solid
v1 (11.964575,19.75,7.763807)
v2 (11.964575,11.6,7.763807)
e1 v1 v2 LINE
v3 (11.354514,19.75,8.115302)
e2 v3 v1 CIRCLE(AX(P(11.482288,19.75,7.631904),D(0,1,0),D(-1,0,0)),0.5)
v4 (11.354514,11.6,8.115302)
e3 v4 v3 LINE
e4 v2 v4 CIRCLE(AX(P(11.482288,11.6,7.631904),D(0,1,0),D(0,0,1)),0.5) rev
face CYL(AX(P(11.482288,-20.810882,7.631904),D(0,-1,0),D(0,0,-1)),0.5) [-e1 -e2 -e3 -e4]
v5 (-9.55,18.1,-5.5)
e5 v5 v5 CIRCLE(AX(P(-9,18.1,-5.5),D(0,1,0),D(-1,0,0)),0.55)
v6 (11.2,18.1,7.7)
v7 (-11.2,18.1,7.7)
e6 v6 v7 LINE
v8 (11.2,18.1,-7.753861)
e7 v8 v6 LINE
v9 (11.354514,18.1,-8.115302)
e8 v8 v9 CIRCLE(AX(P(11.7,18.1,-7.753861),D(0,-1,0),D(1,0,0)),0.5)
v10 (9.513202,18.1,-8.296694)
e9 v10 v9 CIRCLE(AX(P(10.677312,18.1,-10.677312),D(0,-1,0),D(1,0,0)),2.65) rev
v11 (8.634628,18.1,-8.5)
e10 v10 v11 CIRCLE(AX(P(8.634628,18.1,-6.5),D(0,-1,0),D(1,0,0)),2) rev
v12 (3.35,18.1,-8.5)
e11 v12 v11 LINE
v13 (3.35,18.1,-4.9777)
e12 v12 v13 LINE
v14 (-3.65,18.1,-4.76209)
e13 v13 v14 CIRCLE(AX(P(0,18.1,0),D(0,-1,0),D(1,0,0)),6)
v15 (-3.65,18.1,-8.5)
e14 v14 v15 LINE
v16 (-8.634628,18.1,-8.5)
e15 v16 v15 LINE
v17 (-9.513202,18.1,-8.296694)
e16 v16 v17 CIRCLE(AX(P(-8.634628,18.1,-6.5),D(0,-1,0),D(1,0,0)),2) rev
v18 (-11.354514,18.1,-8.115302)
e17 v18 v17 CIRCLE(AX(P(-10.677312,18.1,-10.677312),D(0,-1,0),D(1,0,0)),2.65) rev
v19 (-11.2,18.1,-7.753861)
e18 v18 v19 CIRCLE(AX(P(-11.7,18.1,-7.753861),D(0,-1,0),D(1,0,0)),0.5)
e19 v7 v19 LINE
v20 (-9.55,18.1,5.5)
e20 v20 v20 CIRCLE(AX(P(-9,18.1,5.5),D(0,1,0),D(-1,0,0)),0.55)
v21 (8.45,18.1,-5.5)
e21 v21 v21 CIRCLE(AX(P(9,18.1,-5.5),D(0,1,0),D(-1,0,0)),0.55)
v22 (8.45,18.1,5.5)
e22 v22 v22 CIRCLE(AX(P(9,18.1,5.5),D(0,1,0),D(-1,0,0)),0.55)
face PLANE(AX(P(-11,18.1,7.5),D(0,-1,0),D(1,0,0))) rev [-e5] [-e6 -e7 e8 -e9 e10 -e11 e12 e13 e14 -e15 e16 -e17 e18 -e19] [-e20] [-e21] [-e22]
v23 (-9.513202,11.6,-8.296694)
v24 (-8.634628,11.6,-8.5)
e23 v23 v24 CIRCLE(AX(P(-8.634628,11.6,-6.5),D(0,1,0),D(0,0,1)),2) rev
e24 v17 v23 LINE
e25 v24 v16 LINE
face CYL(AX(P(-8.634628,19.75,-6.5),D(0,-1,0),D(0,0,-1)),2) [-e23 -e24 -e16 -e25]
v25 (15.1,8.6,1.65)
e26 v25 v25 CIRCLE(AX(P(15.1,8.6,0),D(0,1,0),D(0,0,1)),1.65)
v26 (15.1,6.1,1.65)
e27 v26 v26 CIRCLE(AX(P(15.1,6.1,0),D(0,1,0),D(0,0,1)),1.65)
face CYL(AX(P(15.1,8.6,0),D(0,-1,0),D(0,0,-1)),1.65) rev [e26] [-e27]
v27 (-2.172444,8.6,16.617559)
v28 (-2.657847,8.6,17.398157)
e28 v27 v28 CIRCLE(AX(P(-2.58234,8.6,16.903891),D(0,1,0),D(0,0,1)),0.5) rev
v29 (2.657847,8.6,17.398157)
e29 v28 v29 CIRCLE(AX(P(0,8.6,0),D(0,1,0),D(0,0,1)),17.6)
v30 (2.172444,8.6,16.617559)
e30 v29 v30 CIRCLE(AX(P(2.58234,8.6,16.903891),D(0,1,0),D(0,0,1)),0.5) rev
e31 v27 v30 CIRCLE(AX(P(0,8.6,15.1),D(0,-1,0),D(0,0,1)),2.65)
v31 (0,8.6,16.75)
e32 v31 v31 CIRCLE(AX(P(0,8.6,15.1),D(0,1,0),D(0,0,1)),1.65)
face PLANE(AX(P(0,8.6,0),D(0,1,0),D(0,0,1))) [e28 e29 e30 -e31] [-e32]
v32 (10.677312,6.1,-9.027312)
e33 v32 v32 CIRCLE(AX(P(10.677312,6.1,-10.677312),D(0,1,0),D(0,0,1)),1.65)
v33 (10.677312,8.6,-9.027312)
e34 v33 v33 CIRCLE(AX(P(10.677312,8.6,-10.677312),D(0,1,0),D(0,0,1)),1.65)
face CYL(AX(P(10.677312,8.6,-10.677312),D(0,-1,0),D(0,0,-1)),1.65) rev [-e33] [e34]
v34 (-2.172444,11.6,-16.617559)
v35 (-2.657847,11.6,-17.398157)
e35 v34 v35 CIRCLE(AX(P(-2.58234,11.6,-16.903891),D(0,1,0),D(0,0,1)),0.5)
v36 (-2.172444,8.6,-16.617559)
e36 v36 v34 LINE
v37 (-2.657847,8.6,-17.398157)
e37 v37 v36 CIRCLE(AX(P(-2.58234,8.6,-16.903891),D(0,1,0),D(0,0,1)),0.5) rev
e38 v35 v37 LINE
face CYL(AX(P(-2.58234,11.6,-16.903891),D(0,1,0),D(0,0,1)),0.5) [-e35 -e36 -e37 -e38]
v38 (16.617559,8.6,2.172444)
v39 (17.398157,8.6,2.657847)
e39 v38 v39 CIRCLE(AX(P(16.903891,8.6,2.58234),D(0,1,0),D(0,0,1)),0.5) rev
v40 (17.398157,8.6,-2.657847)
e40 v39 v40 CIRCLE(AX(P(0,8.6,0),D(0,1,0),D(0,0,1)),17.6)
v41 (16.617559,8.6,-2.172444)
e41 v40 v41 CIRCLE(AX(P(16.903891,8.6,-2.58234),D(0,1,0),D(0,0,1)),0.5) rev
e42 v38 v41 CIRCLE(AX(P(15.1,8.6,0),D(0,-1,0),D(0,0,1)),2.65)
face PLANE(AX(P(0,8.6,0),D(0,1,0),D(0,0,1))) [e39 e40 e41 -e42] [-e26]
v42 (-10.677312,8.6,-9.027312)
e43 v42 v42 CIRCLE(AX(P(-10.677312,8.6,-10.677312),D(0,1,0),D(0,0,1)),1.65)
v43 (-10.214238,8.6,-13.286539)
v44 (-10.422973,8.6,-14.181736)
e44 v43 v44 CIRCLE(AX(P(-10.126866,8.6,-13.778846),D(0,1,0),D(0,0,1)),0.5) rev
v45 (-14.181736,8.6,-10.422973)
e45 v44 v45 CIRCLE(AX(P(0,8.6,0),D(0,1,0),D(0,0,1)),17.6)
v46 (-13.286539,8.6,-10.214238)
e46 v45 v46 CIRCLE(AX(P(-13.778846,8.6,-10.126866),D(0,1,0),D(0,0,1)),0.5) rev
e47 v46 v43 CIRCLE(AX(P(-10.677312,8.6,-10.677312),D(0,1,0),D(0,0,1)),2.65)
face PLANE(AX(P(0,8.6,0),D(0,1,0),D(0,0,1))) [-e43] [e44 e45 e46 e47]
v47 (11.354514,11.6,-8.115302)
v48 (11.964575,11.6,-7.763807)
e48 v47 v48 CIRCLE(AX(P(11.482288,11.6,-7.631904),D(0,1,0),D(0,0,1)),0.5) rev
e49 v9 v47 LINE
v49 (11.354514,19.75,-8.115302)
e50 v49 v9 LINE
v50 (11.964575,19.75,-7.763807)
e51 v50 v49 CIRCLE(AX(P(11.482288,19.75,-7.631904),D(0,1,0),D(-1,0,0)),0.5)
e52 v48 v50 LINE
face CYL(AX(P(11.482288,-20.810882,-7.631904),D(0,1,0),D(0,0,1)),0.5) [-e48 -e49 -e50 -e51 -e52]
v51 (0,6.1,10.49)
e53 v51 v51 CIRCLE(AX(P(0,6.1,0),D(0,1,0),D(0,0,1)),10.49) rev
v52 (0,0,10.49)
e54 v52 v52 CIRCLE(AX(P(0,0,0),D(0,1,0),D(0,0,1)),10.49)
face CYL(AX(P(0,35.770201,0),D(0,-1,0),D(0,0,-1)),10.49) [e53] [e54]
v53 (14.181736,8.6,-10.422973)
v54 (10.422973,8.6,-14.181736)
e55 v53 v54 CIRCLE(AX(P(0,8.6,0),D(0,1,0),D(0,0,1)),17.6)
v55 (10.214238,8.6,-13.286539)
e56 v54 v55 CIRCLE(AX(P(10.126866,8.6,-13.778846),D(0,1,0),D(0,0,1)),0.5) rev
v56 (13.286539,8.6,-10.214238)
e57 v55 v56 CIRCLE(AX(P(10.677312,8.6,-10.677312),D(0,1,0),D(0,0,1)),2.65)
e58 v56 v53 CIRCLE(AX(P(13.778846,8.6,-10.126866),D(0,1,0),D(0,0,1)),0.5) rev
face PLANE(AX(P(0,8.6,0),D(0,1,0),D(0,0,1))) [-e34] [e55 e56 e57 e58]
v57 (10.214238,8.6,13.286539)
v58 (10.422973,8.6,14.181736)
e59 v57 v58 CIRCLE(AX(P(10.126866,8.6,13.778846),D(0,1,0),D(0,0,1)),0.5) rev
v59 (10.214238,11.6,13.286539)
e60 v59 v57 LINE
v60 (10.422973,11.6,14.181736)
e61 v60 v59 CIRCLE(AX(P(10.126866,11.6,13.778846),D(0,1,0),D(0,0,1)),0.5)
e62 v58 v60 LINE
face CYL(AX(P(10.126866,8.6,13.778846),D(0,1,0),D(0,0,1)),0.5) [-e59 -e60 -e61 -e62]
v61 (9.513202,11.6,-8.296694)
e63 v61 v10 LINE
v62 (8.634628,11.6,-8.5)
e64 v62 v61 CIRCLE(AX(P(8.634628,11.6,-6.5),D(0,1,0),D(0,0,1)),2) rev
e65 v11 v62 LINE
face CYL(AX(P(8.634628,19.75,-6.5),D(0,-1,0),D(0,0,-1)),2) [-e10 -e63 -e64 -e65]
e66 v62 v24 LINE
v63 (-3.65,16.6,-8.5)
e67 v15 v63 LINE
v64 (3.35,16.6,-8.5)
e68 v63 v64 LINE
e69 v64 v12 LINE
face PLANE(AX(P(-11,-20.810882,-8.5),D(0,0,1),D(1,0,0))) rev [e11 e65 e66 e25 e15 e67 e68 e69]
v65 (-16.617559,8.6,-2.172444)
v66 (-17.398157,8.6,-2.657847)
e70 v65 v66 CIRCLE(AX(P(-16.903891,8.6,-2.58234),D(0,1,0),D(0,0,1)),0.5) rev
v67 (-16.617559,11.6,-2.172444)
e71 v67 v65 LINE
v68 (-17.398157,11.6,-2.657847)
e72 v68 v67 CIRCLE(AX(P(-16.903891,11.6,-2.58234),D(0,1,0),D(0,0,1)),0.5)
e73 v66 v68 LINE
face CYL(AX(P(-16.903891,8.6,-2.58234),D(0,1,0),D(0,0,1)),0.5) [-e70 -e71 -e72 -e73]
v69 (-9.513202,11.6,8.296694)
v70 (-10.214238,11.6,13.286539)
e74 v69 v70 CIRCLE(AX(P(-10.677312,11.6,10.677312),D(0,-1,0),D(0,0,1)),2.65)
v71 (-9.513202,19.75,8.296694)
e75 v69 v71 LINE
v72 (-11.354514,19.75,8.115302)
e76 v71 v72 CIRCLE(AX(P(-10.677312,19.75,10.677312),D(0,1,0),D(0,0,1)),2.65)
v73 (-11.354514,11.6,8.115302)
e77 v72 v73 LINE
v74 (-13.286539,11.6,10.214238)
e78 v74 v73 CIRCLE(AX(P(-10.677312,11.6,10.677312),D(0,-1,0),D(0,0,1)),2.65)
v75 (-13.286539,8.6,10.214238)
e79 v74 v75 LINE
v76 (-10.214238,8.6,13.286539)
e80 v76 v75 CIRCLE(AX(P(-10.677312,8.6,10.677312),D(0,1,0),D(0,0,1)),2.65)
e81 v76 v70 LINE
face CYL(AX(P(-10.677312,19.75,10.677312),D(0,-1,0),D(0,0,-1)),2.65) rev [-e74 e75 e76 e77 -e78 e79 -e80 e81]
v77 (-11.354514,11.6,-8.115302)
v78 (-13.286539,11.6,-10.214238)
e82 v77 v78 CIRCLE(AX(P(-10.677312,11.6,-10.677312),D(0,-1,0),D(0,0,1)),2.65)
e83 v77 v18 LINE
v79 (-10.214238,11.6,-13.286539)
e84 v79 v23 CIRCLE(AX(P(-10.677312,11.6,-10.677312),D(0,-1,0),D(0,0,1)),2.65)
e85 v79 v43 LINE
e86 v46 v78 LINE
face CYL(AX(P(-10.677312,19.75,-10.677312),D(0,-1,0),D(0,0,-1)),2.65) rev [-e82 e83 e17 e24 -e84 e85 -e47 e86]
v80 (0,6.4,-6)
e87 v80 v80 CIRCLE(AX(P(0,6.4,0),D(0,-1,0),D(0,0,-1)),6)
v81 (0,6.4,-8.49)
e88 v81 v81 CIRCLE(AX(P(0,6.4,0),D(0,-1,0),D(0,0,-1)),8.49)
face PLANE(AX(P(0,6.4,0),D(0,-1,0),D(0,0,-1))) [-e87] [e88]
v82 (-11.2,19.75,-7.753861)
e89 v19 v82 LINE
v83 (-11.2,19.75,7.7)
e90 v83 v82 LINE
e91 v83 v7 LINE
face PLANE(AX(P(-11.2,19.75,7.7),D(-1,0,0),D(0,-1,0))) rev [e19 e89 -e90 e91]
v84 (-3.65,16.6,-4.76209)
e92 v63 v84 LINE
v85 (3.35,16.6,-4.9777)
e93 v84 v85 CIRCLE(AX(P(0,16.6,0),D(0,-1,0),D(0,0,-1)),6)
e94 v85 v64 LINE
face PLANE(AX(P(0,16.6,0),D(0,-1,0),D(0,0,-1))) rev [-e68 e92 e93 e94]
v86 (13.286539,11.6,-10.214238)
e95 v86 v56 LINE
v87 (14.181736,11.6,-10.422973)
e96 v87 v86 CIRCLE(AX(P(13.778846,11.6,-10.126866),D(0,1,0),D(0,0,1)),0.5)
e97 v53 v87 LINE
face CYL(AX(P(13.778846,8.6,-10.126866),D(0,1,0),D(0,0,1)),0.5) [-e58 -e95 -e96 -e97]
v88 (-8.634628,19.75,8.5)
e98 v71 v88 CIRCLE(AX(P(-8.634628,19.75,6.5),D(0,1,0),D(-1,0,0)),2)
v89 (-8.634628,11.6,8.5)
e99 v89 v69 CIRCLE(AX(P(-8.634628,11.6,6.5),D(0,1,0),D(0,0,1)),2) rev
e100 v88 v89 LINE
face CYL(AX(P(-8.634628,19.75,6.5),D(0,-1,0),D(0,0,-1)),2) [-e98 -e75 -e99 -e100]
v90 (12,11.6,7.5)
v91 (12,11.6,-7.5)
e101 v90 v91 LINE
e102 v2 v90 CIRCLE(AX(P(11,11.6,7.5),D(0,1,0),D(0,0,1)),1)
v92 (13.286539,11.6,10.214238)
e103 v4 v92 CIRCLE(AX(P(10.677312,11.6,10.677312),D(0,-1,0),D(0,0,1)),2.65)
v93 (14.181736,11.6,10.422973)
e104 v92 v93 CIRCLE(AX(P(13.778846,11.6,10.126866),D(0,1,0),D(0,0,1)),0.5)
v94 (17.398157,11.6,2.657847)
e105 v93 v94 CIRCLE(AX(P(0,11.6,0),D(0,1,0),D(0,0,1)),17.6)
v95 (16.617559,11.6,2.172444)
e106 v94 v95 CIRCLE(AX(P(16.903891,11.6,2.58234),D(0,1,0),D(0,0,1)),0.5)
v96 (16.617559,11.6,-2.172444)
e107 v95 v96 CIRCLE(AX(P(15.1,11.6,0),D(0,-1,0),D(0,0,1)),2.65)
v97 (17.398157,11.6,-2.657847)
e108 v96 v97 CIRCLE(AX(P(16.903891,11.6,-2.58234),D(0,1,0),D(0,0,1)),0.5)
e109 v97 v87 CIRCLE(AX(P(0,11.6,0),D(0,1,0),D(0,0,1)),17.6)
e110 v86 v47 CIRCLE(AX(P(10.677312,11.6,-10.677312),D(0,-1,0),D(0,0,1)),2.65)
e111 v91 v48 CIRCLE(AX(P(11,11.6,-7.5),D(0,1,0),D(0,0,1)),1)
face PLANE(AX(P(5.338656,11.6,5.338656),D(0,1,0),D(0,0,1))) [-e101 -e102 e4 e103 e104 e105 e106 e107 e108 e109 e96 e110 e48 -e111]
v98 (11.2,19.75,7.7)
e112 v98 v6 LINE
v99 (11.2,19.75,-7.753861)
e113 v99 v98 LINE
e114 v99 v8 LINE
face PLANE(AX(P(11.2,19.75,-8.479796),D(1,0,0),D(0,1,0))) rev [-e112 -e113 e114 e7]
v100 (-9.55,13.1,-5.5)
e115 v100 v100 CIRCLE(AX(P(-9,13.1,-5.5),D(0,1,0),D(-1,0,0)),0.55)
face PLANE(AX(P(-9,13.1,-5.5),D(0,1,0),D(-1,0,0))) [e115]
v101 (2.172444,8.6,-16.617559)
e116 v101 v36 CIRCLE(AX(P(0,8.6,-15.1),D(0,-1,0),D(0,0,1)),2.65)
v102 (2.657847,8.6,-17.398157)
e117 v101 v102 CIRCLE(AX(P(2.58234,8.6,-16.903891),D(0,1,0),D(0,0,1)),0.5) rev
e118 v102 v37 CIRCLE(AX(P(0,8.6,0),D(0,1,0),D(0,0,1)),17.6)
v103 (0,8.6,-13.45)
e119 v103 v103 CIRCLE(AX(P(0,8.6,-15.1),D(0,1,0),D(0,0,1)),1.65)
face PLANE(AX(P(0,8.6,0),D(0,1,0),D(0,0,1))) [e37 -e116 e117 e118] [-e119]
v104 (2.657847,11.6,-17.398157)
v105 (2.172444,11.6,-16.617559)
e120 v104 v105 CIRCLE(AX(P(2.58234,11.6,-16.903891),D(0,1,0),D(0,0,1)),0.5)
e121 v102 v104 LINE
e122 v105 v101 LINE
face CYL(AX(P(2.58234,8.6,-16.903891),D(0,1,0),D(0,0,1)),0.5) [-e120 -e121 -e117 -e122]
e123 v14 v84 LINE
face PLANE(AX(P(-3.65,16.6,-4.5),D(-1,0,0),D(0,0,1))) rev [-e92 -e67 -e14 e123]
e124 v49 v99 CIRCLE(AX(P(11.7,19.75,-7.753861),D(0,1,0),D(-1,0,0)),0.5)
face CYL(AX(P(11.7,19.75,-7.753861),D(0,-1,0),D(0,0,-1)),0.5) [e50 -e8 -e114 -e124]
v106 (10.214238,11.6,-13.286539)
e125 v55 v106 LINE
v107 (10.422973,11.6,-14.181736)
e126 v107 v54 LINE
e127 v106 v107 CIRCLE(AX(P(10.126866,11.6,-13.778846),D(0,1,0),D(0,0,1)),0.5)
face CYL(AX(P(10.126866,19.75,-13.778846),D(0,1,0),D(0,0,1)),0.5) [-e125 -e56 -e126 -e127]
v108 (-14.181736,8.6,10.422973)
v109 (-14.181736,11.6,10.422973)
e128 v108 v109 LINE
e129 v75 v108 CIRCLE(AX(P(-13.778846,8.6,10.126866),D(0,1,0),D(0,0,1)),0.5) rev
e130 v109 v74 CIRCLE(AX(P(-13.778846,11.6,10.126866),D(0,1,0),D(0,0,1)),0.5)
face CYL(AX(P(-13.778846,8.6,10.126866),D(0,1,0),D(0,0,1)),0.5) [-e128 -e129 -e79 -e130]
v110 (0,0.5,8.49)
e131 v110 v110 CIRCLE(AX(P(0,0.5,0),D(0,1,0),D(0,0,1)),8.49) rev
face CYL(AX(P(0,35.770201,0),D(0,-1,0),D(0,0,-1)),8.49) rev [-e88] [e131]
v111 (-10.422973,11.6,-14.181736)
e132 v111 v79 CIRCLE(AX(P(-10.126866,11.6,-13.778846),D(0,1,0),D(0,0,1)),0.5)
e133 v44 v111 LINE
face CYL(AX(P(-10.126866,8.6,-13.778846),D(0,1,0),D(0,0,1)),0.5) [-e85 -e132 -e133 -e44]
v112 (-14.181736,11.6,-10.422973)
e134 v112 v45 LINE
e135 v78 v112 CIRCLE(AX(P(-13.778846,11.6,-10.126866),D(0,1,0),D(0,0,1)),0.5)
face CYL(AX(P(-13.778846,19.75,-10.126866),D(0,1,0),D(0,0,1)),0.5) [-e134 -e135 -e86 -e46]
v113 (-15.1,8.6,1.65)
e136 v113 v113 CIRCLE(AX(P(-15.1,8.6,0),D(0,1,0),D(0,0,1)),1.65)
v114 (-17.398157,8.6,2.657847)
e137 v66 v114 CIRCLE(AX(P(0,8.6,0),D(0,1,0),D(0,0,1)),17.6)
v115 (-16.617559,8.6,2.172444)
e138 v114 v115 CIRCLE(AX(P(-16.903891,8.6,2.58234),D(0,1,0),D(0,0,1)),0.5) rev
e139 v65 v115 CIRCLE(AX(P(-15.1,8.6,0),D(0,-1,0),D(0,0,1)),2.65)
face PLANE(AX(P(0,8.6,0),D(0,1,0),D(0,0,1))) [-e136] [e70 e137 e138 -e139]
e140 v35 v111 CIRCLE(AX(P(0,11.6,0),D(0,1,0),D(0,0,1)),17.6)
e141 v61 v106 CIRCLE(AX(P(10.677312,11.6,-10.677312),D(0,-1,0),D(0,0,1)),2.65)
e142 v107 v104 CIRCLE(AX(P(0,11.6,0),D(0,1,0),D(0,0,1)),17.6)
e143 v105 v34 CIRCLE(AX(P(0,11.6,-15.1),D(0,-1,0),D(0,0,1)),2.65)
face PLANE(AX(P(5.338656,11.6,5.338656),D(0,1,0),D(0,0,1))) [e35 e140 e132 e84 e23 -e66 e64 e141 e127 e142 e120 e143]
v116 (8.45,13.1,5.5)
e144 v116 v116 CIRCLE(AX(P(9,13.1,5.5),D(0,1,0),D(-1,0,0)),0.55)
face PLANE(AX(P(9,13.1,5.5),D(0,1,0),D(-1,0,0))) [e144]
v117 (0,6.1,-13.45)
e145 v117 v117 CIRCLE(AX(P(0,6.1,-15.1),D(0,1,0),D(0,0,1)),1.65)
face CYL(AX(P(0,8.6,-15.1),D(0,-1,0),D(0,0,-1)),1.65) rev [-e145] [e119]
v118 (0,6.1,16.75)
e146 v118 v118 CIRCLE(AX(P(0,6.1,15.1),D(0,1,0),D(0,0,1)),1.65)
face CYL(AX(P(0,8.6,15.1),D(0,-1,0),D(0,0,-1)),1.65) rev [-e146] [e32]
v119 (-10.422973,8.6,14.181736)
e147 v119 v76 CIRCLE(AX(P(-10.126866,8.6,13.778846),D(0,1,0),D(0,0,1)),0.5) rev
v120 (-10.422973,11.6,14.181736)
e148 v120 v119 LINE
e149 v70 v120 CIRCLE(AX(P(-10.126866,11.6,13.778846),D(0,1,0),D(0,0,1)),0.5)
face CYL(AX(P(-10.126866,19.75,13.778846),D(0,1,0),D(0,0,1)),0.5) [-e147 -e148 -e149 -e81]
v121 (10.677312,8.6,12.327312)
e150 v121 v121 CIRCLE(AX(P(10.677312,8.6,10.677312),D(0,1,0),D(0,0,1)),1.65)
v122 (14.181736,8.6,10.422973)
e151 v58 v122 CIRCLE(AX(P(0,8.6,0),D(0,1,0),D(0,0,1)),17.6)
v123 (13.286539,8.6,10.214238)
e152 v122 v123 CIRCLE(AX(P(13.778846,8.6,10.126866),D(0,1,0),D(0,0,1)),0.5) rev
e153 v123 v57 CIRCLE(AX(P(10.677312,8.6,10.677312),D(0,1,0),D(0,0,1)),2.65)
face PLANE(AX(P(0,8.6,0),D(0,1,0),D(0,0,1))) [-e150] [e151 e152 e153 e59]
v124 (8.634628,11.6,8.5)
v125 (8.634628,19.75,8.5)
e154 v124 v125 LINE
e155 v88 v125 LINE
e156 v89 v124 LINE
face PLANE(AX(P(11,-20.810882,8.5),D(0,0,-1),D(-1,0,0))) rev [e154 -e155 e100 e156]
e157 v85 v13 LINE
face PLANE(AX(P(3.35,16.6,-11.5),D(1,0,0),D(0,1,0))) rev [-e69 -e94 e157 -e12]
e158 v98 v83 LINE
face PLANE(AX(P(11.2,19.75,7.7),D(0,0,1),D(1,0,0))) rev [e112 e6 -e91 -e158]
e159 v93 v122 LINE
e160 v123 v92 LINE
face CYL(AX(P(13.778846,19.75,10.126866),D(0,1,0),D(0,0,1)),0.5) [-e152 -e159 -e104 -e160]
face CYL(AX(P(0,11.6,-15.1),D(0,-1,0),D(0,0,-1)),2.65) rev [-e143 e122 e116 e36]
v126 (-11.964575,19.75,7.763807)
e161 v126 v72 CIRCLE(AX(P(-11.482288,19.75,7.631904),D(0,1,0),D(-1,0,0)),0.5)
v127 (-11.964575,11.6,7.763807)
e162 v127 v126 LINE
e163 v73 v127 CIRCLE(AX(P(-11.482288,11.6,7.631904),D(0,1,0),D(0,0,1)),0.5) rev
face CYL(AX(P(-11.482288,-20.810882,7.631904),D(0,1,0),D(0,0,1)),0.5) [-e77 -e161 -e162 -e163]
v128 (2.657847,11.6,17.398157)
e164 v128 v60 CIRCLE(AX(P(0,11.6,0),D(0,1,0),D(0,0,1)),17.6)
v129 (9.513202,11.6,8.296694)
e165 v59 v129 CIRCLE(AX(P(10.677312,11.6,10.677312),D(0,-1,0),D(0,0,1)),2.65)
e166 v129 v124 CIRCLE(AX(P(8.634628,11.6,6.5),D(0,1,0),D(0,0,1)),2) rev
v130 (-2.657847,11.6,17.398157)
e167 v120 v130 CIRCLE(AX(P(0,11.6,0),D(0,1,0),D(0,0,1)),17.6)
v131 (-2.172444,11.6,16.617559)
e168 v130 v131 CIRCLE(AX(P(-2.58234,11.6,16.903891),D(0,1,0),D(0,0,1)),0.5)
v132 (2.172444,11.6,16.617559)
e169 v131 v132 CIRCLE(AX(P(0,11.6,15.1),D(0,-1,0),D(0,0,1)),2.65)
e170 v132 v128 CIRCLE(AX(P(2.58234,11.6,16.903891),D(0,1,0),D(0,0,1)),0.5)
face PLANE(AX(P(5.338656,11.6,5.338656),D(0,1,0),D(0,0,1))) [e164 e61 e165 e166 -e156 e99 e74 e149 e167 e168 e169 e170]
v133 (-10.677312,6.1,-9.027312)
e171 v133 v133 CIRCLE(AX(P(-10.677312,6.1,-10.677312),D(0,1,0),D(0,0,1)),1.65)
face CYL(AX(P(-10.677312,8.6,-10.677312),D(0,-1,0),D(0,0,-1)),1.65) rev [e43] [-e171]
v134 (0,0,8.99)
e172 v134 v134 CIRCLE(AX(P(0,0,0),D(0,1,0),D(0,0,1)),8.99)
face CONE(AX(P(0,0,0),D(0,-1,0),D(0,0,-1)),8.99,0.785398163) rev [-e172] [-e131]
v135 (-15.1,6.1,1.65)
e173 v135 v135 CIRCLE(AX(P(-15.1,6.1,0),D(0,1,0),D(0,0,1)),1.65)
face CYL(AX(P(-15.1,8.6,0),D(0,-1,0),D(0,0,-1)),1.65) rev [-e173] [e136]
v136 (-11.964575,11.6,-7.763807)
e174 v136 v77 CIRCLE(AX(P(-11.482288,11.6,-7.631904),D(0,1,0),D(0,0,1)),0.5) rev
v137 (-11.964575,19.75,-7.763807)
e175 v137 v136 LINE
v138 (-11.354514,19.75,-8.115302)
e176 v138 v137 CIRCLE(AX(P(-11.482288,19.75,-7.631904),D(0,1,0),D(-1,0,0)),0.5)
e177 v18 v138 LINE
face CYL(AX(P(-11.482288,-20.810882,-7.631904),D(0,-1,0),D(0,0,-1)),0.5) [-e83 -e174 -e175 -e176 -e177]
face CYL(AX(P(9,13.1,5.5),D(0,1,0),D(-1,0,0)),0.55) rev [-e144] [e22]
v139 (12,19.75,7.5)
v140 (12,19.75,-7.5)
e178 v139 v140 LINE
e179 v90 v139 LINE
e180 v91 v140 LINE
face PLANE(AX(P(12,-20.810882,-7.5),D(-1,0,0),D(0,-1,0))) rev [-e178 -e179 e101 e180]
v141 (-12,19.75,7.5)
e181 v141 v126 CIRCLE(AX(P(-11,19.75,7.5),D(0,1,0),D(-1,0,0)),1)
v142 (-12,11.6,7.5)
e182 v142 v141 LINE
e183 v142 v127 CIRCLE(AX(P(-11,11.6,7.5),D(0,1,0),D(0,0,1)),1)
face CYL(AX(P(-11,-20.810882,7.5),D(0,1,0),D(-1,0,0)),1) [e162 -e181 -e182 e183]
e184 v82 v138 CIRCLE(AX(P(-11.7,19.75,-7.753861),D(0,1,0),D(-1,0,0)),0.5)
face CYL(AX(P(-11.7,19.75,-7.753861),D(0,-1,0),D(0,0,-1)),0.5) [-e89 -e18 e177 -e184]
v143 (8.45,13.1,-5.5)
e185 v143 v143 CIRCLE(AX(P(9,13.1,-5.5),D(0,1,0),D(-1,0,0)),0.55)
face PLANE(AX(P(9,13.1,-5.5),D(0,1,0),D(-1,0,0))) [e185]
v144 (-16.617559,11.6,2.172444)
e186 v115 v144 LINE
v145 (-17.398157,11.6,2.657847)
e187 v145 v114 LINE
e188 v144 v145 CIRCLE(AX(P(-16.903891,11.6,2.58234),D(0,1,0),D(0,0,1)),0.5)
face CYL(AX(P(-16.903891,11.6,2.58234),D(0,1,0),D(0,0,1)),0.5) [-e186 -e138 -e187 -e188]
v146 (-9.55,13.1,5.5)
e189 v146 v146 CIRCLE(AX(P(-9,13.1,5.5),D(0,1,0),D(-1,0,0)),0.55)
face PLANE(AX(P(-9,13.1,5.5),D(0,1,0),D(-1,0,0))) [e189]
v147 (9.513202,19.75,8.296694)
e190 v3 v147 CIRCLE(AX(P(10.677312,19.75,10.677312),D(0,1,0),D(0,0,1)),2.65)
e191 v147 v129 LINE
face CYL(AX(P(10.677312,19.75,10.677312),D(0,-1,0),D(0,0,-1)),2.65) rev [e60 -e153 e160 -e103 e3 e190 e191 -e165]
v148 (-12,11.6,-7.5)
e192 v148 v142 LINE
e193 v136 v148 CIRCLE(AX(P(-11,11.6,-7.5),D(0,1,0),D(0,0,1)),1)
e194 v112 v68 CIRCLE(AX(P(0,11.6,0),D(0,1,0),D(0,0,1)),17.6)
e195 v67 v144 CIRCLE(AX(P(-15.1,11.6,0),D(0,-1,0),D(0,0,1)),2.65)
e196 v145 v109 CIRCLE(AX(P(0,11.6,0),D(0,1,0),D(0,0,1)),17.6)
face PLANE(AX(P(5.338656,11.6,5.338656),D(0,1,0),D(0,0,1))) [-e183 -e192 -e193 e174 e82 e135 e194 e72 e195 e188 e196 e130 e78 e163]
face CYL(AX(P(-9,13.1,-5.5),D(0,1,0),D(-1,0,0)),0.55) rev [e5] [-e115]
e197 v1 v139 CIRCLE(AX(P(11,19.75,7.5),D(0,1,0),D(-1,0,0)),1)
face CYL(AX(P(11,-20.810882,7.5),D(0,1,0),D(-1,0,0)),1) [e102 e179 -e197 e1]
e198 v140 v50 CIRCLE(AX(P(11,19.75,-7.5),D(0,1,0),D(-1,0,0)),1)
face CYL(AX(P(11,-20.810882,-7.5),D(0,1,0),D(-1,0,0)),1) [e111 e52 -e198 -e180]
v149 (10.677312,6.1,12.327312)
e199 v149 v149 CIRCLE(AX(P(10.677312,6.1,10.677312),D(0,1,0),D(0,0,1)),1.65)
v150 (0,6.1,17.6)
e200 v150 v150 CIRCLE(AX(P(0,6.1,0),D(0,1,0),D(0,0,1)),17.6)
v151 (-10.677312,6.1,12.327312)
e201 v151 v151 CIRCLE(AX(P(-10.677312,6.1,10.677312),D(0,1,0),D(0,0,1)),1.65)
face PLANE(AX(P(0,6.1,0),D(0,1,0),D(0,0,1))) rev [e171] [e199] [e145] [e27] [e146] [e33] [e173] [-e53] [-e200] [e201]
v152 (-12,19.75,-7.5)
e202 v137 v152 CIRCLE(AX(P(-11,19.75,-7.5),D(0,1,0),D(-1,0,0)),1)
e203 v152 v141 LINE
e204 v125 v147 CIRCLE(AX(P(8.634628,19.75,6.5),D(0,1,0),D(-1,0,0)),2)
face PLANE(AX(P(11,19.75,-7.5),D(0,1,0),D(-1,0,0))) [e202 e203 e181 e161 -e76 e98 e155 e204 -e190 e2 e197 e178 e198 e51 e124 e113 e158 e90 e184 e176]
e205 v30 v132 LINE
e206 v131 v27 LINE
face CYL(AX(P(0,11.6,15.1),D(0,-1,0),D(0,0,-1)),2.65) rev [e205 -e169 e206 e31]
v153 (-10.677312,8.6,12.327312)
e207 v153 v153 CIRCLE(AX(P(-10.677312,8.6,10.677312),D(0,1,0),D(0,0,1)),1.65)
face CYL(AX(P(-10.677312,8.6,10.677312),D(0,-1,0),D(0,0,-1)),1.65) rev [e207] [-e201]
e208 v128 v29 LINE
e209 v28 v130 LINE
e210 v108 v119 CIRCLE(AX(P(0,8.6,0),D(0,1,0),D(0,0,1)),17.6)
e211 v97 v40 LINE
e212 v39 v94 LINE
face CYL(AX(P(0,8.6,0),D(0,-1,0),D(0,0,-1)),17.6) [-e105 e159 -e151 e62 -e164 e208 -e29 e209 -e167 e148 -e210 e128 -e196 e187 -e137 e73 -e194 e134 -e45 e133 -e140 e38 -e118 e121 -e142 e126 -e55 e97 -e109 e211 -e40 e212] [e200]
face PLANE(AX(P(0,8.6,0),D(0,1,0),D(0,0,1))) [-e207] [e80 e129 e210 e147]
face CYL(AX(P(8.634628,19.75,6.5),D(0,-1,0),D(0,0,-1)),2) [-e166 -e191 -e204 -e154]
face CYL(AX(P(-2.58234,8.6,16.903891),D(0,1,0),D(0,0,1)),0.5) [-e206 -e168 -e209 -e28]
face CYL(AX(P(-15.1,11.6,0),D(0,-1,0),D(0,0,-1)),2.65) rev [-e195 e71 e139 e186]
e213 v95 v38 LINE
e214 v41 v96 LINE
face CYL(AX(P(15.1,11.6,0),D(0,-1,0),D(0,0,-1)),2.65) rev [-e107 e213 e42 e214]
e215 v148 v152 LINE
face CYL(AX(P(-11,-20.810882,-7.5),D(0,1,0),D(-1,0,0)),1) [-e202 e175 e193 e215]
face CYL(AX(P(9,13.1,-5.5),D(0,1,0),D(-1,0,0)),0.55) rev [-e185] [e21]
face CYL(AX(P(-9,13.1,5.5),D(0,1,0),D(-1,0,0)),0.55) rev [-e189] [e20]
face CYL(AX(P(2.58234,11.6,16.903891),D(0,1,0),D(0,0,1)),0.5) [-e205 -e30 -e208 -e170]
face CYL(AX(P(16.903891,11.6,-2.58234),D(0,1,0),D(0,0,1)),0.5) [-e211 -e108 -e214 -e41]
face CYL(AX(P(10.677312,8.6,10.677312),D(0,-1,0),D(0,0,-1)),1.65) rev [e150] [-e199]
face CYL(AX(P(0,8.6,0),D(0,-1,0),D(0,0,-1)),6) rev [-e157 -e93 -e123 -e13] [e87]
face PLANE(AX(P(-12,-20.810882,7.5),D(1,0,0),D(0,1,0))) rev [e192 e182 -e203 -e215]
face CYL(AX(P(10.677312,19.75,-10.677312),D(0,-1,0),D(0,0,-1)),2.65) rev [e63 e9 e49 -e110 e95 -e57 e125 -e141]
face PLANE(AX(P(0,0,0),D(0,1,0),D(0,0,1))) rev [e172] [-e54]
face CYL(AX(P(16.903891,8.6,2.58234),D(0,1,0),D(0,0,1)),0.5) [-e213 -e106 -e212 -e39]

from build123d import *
from build123d.topology import SkipClean

# Parameters (mm, degrees)
SKETCH2_R           = 17.6
SKETCH2_R_2         = 6
SKETCH2_R_3         = 1.65
BOSS_EXTRUDE1_DEPTH = 2.5
SKETCH3_R           = 10.49
SKETCH3_R_2         = 8.49
BOSS_EXTRUDE2_DEPTH = 6.1
BOSS_EXTRUDE3_START = 9.5
SKETCH5_R           = 6
BOSS_EXTRUDE3_DEPTH = 9.5
BOSS_EXTRUDE4_DEPTH = 1.65
SKETCH7_R           = 2.65
CUT_EXTRUDE1_DEPTH  = 28.273476126
SKETCH8_R           = 6
BOSS_EXTRUDE5_DEPTH = 3
FILLET2_R           = 0.5
FILLET3_R           = 0.5
FILLET4_R           = 2
CHAMFER1_SIZE       = 0.5
SKETCH9_R           = 0.55
CUT_EXTRUDE2_DEPTH  = 5
SKETCH10_R          = 8.49
CUT_EXTRUDE4_DEPTH  = 0.3
CUT_EXTRUDE5_DEPTH  = 1.5


with BuildPart() as part:
    # Sketch2 → Boss-Extrude1 (new body)
    with BuildSketch(Plane(origin=(0, 6.1, 0), x_dir=(1, 0, 0), z_dir=(0, 1, 0))):
        with Locations(Location((0, 0, 0), (0, 0, 270))):
            Circle(SKETCH2_R)
        with Locations(Location((0, 0, 0), (0, 0, 270))):
            Circle(SKETCH2_R_2, mode=Mode.SUBTRACT)
        with Locations(Location((0, -15.1, 0), (0, 0, 270))):
            Circle(SKETCH2_R_3, mode=Mode.SUBTRACT)
        with Locations(Location((-10.677312396, -10.677312396, 0), (0, 0, 270))):
            Circle(SKETCH2_R_3, mode=Mode.SUBTRACT)
        with Locations(Location((-15.1, 0, 0), (0, 0, 270))):
            Circle(SKETCH2_R_3, mode=Mode.SUBTRACT)
        with Locations(Location((-10.677312396, 10.677312396, 0), (0, 0, 270))):
            Circle(SKETCH2_R_3, mode=Mode.SUBTRACT)
        with Locations(Location((0, 15.1, 0), (0, 0, 270))):
            Circle(SKETCH2_R_3, mode=Mode.SUBTRACT)
        with Locations(Location((10.677312396, 10.677312396, 0), (0, 0, 270))):
            Circle(SKETCH2_R_3, mode=Mode.SUBTRACT)
        with Locations(Location((15.1, 0, 0), (0, 0, 270))):
            Circle(SKETCH2_R_3, mode=Mode.SUBTRACT)
        with Locations(Location((10.677312396, -10.677312396, 0), (0, 0, 270))):
            Circle(SKETCH2_R_3, mode=Mode.SUBTRACT)
    extrude(amount=BOSS_EXTRUDE1_DEPTH)

    # Sketch3 → Boss-Extrude2 (add)
    with BuildSketch(Plane(origin=(0, 0, 0), x_dir=(1, 0, 0), z_dir=(0, 1, 0))):
        with Locations(Location((0, 0, 0), (0, 0, 270))):
            Circle(SKETCH3_R)
        with Locations(Location((0, 0, 0), (0, 0, 270))):
            Circle(SKETCH3_R_2, mode=Mode.SUBTRACT)
    extrude(amount=BOSS_EXTRUDE2_DEPTH)

    # Sketch5 → Boss-Extrude3 (add)
    with BuildSketch(Plane(origin=(0, 18.1, 0), x_dir=(-1, 0, 0), z_dir=(0, -1, 0)).offset(BOSS_EXTRUDE3_START)):
        with BuildLine():
            Line((-12, 7.5), (-12, -7.5))
            ThreePointArc((-12, -7.5), (-11.707106781, -8.207106781), (-11, -8.5))
            Line((-11, -8.5), (11, -8.5))
            ThreePointArc((11, -8.5), (11.707106781, -8.207106781), (12, -7.5))
            Line((12, -7.5), (12, 7.5))
            ThreePointArc((12, 7.5), (11.707106781, 8.207106781), (11, 8.5))
            Line((11, 8.5), (-11, 8.5))
            ThreePointArc((-11, 8.5), (-11.707106781, 8.207106781), (-12, 7.5))
        make_face()
        with Locations(Location((0, 0, 0), (0, 0, 180))):
            Circle(SKETCH5_R, mode=Mode.SUBTRACT)
    extrude(amount=-BOSS_EXTRUDE3_DEPTH)

    # Sketch6 → Boss-Extrude4 (add)
    with BuildSketch(Plane(origin=(0, 18.1, 0), x_dir=(1, 0, 0), z_dir=(0, 1, 0))):
        with BuildLine():
            Line((-12, 7.5), (-12, -7.5))
            ThreePointArc((-12, -7.5), (-11.707106781, -8.207106781), (-11, -8.5))
            Line((-11, -8.5), (11, -8.5))
            ThreePointArc((11, -8.5), (11.707106781, -8.207106781), (12, -7.5))
            Line((12, -7.5), (12, 7.5))
            ThreePointArc((12, 7.5), (11.774596669, 8.132455532), (11.2, 8.479795897))
            Line((11.2, 8.479795897), (11.2, -7.7))
            Line((11.2, -7.7), (-11.2, -7.7))
            Line((-11.2, -7.7), (-11.2, 8.479795897))
            ThreePointArc((-11.2, 8.479795897), (-11.774596669, 8.132455532), (-12, 7.5))
        make_face()
    extrude(amount=BOSS_EXTRUDE4_DEPTH)

    # Sketch7 → Cut-Extrude1 (cut, through all)
    with BuildSketch(Plane(origin=(0, 8.6, 0), x_dir=(1, 0, 0), z_dir=(0, 1, 0))):
        with Locations((10.677312396, 10.677312396)):
            Circle(SKETCH7_R)
        with Locations((-10.677312396, 10.677312396)):
            Circle(SKETCH7_R)
        with Locations((-10.677312396, -10.677312396)):
            Circle(SKETCH7_R)
        with Locations((10.677312396, -10.677312396)):
            Circle(SKETCH7_R)
    extrude(amount=CUT_EXTRUDE1_DEPTH, mode=Mode.SUBTRACT)

    # Sketch8 → Boss-Extrude5 (add)
    with SkipClean():  # the faces are left unmerged after this step: merging them gives an invalid solid
        with BuildSketch(Plane(origin=(0, 8.6, 0), x_dir=(1, 0, 0), z_dir=(0, 1, 0))):
            with BuildLine():
                ThreePointArc((0.948547859, -17.57442053), (6.73522841, -16.260279772), (11.756267308, -13.097716556))
                ThreePointArc((11.756267308, -13.097716556), (8.803479426, -8.803479426), (13.097716556, -11.756267308))
                ThreePointArc((13.097716556, -11.756267308), (16.260279772, -6.73522841), (17.57442053, -0.948547859))
                ThreePointArc((17.57442053, -0.948547859), (12.45, 0), (17.57442053, 0.948547859))
                ThreePointArc((17.57442053, 0.948547859), (16.260279772, 6.73522841), (13.097716556, 11.756267308))
                ThreePointArc((13.097716556, 11.756267308), (8.803479426, 8.803479426), (11.756267308, 13.097716556))
                ThreePointArc((11.756267308, 13.097716556), (6.73522841, 16.260279772), (0.948547859, 17.57442053))
                ThreePointArc((0.948547859, 17.57442053), (0, 12.45), (-0.948547859, 17.57442053))
                ThreePointArc((-0.948547859, 17.57442053), (-6.73522841, 16.260279772), (-11.756267308, 13.097716556))
                ThreePointArc((-11.756267308, 13.097716556), (-8.803479426, 8.803479426), (-13.097716556, 11.756267308))
                ThreePointArc((-13.097716556, 11.756267308), (-16.260279772, 6.73522841), (-17.57442053, 0.948547859))
                ThreePointArc((-17.57442053, 0.948547859), (-12.45, 0), (-17.57442053, -0.948547859))
                ThreePointArc((-17.57442053, -0.948547859), (-16.260279772, -6.73522841), (-13.097716556, -11.756267308))
                ThreePointArc((-13.097716556, -11.756267308), (-8.803479426, -8.803479426), (-11.756267308, -13.097716556))
                ThreePointArc((-11.756267308, -13.097716556), (-6.73522841, -16.260279772), (-0.948547859, -17.57442053))
                ThreePointArc((-0.948547859, -17.57442053), (0, -12.45), (0.948547859, -17.57442053))
            make_face()
            Circle(SKETCH8_R, mode=Mode.SUBTRACT)
        extrude(amount=BOSS_EXTRUDE5_DEPTH)

    # Fillet2
    # the kernel refuses this fillet: 0.5 mm, written as the material it takes off along each edge
    with BuildSketch(Plane(origin=(-11.686597151, 21.100589596, 8.227038068), x_dir=(0.947787501737023, 0, -0.3189025737605338), z_dir=(0, -1, 0)), Plane(origin=(11.686597151, 21.100589596, -8.227038068), x_dir=(-0.9477875017370256, 0, 0.3189025737605259), z_dir=(0, -1, 0))) as fillet2_piece_1:
        with BuildLine():
            CenterArc((0.383431843, -0.498906206), FILLET2_R, 93.790527606, 89.509954117)
            ThreePointArc((-0.115738823, -0.527692416), (-0.094179071, -0.255882407), (0, 0))
            ThreePointArc((0, 0), (0.175188687, -0.00579711), (0.350377374, 0))
        make_face()
    extrude(amount=9.500589596, mode=Mode.SUBTRACT)
    with BuildSketch(Plane(origin=(11.686597151, 21.100589596, 8.227038068), x_dir=(0.5145498683464933, 0, -0.8574604556389797), z_dir=(0, -1, 0)), Plane(origin=(-11.686597151, 21.100589596, -8.227038068), x_dir=(-0.5145498683463678, 0, 0.8574604556390548), z_dir=(0, -1, 0))) as fillet2_piece_2:
        with BuildLine():
            CenterArc((0.405176879, -0.481413624), FILLET2_R, 74.328716152, 89.509954117)
            ThreePointArc((-0.075064004, -0.342242165), (-0.031869492, -0.172363041), (0, 0))
            ThreePointArc((0, 0), (0.270117919, 0.037172752), (0.540235838, 0))
        make_face()
    extrude(amount=9.500589596, mode=Mode.SUBTRACT)
    with BuildSketch(Plane(origin=(11.756267308, 8.6, 13.097716556), x_dir=(-0.7759095356901404, 0, 0.6308441902919537), z_dir=(0, 1, 0)), Plane(origin=(13.097716556, 8.6, -11.756267308), x_dir=(0.6308441902919549, 0, 0.7759095356901394), z_dir=(0, 1, 0)), Plane(origin=(-11.756267308, 8.6, -13.097716556), x_dir=(0.775909535690134, 0, -0.6308441902919616), z_dir=(0, 1, 0)), Plane(origin=(-13.097716556, 8.6, 11.756267308), x_dir=(-0.630844190291963, 0, -0.7759095356901329), z_dir=(0, 1, 0)), Plane(origin=(17.57442053, 8.6, 0.948547859), x_dir=(-0.1025766894462237, 0, 0.9947250991013814), z_dir=(0, 1, 0)), Plane(origin=(0.948547859, 8.6, -17.57442053), x_dir=(0.9947250991013814, 0, 0.10257668944622358), z_dir=(0, 1, 0)), Plane(origin=(-17.57442053, 8.6, -0.948547859), x_dir=(0.1025766894462172, 0, -0.9947250991013821), z_dir=(0, 1, 0)), Plane(origin=(-0.948547859, 8.6, 17.57442053), x_dir=(-0.9947250991013822, 0, -0.10257668944621537), z_dir=(0, 1, 0))) as fillet2_piece_3:
        with BuildLine():
            CenterArc((1.693954461, -0.499403867), FILLET2_R, 87.201872274, 133.621879811)
            ThreePointArc((1.315592404, -0.826271047), (0.71970544, -0.314563362), (0, 0))
            ThreePointArc((0, 0), (0.859181513, 0.020983898), (1.718363027, 0))
        make_face()
    extrude(amount=7.295907567, mode=Mode.SUBTRACT)
    with BuildSketch(Plane(origin=(13.097716556, 8.6, 11.756267308), x_dir=(0.6308441902919746, 0, -0.7759095356901236), z_dir=(0, 1, 0)), Plane(origin=(17.57442053, 8.6, -0.948547859), x_dir=(-0.1025766894462046, 0, -0.9947250991013833), z_dir=(0, 1, 0)), Plane(origin=(11.756267308, 8.6, -13.097716556), x_dir=(-0.7759095356901274, 0, -0.6308441902919697), z_dir=(0, 1, 0)), Plane(origin=(-0.948547859, 8.6, -17.57442053), x_dir=(-0.9947250991013827, 0, 0.10257668944621066), z_dir=(0, 1, 0)), Plane(origin=(-13.097716556, 8.6, -11.756267308), x_dir=(-0.6308441902919705, 0, 0.7759095356901267), z_dir=(0, 1, 0)), Plane(origin=(-17.57442053, 8.6, 0.948547859), x_dir=(0.10257668944620901, 0, 0.9947250991013828), z_dir=(0, 1, 0)), Plane(origin=(-11.756267308, 8.6, 13.097716556), x_dir=(0.7759095356901295, 0, 0.630844190291967), z_dir=(0, 1, 0)), Plane(origin=(0.948547859, 8.6, 17.57442053), x_dir=(0.9947250991013818, 0, -0.10257668944621866), z_dir=(0, 1, 0))) as fillet2_piece_4:
        with BuildLine():
            CenterArc((1.693954461, 0.499403867), FILLET2_R, 139.176247915, 133.621879811)
            ThreePointArc((1.315592404, 0.826271047), (0.71970544, 0.314563362), (0, 0))
            ThreePointArc((0, 0), (0.859181513, -0.020983898), (1.718363027, 0))
        make_face()
    extrude(amount=7.295907567, mode=Mode.SUBTRACT)

    # Fillet3
    # the kernel refuses this fillet: 0.5 mm, written as the material it takes off along each edge
    with BuildSketch(Plane(origin=(-11.2, 20.563775383, -8.079371352), x_dir=(0, 0, 1), z_dir=(0, -1, 0))) as fillet3_piece_1:
        with BuildLine():
            CenterArc((0.325510153, 0.5), FILLET3_R, 223.707123391, 46.292876609)
            Line((-0.03593047, 0.154513855), (-0.043159282, 0.147604132))
            ThreePointArc((-0.043159282, 0.147604132), (-0.026548893, 0.075260894), (-0.009803551, -0.001972406))
            Line((-0.009803551, -0.001972406), (0, -0.01))
            Line((0, -0.01), (0.325510153, -0.01))
            Line((0.325510153, -0.01), (0.325510153, 0))
        make_face()
    extrude(amount=2.463775383, mode=Mode.SUBTRACT)
    with BuildSketch(Plane(origin=(11.2, 20.563775383, -8.079371352), x_dir=(0.9740121783889754, 0, -0.2264956431147472), z_dir=(0, -1, 0))) as fillet3_piece_2:
        with BuildLine():
            CenterArc((0.413279458, 0.430298675), FILLET3_R, 193.090842954, 46.292876609)
            Line((-0.073726631, 0.317050853), (-0.083466753, 0.314785897))
            Line((-0.083466753, 0.314785897), (-0.009740122, -0.002264956))
            Line((-0.009740122, -0.002264956), (0.000299314, -0.00999552))
            ThreePointArc((0.000299314, -0.00999552), (0.079318236, -0.008812681), (0.153543612, -0.008605973))
            Line((0.153543612, -0.008605973), (0.158636471, 0))
        make_face()
    extrude(amount=2.463775383, mode=Mode.SUBTRACT)

    # Fillet4
    fillet4_edges = [part.edges().sort_by_distance(p)[0] for p in [
        (9.166746035, 15.675, 8.5),
        (-9.166746035, 14.85, -8.5),
        (-9.166746035, 15.675, 8.5),
        (9.166746035, 14.85, -8.5),
    ]]
    fillet(fillet4_edges, radius=FILLET4_R)

    # Chamfer1
    chamfer1_edges = [part.edges().sort_by_distance(p)[0] for p in [
        (0, 0, -8.49),
    ]]
    chamfer(chamfer1_edges, length=CHAMFER1_SIZE)

    # Sketch9 → Cut-Extrude2 (cut)
    with BuildSketch(Plane(origin=(0, 18.1, 0), x_dir=(1, 0, 0), z_dir=(0, 1, 0))):
        with Locations(Location((9, -5.5, 0), (0, 0, 180))):
            Circle(SKETCH9_R)
        with Locations(Location((-9, -5.5, 0), (0, 0, 180))):
            Circle(SKETCH9_R)
        with Locations(Location((-9, 5.5, 0), (0, 0, 180))):
            Circle(SKETCH9_R)
        with Locations(Location((9, 5.5, 0), (0, 0, 180))):
            Circle(SKETCH9_R)
    extrude(amount=-CUT_EXTRUDE2_DEPTH, mode=Mode.SUBTRACT)

    # Sketch10 → Cut-Extrude4 (cut)
    with BuildSketch(Plane.XZ.offset(-6.1)):
        with Locations(Location((0, 0, 0), (0, 0, 270))):
            Circle(SKETCH10_R)
    extrude(amount=-CUT_EXTRUDE4_DEPTH, mode=Mode.SUBTRACT)

    # Sketch11 → Cut-Extrude5 (cut)
    with BuildSketch(Plane(origin=(0, 18.1, 0), x_dir=(1, 0, 0), z_dir=(0, 1, 0))):
        Polygon((-5.2, 9), (-5.2, 11.5), (3.35, 11.5), (3.35, 4.5), (-3.65, 4.5), (-3.65, 9), align=None)
    extrude(amount=-CUT_EXTRUDE5_DEPTH, mode=Mode.SUBTRACT)


solid = part.part
